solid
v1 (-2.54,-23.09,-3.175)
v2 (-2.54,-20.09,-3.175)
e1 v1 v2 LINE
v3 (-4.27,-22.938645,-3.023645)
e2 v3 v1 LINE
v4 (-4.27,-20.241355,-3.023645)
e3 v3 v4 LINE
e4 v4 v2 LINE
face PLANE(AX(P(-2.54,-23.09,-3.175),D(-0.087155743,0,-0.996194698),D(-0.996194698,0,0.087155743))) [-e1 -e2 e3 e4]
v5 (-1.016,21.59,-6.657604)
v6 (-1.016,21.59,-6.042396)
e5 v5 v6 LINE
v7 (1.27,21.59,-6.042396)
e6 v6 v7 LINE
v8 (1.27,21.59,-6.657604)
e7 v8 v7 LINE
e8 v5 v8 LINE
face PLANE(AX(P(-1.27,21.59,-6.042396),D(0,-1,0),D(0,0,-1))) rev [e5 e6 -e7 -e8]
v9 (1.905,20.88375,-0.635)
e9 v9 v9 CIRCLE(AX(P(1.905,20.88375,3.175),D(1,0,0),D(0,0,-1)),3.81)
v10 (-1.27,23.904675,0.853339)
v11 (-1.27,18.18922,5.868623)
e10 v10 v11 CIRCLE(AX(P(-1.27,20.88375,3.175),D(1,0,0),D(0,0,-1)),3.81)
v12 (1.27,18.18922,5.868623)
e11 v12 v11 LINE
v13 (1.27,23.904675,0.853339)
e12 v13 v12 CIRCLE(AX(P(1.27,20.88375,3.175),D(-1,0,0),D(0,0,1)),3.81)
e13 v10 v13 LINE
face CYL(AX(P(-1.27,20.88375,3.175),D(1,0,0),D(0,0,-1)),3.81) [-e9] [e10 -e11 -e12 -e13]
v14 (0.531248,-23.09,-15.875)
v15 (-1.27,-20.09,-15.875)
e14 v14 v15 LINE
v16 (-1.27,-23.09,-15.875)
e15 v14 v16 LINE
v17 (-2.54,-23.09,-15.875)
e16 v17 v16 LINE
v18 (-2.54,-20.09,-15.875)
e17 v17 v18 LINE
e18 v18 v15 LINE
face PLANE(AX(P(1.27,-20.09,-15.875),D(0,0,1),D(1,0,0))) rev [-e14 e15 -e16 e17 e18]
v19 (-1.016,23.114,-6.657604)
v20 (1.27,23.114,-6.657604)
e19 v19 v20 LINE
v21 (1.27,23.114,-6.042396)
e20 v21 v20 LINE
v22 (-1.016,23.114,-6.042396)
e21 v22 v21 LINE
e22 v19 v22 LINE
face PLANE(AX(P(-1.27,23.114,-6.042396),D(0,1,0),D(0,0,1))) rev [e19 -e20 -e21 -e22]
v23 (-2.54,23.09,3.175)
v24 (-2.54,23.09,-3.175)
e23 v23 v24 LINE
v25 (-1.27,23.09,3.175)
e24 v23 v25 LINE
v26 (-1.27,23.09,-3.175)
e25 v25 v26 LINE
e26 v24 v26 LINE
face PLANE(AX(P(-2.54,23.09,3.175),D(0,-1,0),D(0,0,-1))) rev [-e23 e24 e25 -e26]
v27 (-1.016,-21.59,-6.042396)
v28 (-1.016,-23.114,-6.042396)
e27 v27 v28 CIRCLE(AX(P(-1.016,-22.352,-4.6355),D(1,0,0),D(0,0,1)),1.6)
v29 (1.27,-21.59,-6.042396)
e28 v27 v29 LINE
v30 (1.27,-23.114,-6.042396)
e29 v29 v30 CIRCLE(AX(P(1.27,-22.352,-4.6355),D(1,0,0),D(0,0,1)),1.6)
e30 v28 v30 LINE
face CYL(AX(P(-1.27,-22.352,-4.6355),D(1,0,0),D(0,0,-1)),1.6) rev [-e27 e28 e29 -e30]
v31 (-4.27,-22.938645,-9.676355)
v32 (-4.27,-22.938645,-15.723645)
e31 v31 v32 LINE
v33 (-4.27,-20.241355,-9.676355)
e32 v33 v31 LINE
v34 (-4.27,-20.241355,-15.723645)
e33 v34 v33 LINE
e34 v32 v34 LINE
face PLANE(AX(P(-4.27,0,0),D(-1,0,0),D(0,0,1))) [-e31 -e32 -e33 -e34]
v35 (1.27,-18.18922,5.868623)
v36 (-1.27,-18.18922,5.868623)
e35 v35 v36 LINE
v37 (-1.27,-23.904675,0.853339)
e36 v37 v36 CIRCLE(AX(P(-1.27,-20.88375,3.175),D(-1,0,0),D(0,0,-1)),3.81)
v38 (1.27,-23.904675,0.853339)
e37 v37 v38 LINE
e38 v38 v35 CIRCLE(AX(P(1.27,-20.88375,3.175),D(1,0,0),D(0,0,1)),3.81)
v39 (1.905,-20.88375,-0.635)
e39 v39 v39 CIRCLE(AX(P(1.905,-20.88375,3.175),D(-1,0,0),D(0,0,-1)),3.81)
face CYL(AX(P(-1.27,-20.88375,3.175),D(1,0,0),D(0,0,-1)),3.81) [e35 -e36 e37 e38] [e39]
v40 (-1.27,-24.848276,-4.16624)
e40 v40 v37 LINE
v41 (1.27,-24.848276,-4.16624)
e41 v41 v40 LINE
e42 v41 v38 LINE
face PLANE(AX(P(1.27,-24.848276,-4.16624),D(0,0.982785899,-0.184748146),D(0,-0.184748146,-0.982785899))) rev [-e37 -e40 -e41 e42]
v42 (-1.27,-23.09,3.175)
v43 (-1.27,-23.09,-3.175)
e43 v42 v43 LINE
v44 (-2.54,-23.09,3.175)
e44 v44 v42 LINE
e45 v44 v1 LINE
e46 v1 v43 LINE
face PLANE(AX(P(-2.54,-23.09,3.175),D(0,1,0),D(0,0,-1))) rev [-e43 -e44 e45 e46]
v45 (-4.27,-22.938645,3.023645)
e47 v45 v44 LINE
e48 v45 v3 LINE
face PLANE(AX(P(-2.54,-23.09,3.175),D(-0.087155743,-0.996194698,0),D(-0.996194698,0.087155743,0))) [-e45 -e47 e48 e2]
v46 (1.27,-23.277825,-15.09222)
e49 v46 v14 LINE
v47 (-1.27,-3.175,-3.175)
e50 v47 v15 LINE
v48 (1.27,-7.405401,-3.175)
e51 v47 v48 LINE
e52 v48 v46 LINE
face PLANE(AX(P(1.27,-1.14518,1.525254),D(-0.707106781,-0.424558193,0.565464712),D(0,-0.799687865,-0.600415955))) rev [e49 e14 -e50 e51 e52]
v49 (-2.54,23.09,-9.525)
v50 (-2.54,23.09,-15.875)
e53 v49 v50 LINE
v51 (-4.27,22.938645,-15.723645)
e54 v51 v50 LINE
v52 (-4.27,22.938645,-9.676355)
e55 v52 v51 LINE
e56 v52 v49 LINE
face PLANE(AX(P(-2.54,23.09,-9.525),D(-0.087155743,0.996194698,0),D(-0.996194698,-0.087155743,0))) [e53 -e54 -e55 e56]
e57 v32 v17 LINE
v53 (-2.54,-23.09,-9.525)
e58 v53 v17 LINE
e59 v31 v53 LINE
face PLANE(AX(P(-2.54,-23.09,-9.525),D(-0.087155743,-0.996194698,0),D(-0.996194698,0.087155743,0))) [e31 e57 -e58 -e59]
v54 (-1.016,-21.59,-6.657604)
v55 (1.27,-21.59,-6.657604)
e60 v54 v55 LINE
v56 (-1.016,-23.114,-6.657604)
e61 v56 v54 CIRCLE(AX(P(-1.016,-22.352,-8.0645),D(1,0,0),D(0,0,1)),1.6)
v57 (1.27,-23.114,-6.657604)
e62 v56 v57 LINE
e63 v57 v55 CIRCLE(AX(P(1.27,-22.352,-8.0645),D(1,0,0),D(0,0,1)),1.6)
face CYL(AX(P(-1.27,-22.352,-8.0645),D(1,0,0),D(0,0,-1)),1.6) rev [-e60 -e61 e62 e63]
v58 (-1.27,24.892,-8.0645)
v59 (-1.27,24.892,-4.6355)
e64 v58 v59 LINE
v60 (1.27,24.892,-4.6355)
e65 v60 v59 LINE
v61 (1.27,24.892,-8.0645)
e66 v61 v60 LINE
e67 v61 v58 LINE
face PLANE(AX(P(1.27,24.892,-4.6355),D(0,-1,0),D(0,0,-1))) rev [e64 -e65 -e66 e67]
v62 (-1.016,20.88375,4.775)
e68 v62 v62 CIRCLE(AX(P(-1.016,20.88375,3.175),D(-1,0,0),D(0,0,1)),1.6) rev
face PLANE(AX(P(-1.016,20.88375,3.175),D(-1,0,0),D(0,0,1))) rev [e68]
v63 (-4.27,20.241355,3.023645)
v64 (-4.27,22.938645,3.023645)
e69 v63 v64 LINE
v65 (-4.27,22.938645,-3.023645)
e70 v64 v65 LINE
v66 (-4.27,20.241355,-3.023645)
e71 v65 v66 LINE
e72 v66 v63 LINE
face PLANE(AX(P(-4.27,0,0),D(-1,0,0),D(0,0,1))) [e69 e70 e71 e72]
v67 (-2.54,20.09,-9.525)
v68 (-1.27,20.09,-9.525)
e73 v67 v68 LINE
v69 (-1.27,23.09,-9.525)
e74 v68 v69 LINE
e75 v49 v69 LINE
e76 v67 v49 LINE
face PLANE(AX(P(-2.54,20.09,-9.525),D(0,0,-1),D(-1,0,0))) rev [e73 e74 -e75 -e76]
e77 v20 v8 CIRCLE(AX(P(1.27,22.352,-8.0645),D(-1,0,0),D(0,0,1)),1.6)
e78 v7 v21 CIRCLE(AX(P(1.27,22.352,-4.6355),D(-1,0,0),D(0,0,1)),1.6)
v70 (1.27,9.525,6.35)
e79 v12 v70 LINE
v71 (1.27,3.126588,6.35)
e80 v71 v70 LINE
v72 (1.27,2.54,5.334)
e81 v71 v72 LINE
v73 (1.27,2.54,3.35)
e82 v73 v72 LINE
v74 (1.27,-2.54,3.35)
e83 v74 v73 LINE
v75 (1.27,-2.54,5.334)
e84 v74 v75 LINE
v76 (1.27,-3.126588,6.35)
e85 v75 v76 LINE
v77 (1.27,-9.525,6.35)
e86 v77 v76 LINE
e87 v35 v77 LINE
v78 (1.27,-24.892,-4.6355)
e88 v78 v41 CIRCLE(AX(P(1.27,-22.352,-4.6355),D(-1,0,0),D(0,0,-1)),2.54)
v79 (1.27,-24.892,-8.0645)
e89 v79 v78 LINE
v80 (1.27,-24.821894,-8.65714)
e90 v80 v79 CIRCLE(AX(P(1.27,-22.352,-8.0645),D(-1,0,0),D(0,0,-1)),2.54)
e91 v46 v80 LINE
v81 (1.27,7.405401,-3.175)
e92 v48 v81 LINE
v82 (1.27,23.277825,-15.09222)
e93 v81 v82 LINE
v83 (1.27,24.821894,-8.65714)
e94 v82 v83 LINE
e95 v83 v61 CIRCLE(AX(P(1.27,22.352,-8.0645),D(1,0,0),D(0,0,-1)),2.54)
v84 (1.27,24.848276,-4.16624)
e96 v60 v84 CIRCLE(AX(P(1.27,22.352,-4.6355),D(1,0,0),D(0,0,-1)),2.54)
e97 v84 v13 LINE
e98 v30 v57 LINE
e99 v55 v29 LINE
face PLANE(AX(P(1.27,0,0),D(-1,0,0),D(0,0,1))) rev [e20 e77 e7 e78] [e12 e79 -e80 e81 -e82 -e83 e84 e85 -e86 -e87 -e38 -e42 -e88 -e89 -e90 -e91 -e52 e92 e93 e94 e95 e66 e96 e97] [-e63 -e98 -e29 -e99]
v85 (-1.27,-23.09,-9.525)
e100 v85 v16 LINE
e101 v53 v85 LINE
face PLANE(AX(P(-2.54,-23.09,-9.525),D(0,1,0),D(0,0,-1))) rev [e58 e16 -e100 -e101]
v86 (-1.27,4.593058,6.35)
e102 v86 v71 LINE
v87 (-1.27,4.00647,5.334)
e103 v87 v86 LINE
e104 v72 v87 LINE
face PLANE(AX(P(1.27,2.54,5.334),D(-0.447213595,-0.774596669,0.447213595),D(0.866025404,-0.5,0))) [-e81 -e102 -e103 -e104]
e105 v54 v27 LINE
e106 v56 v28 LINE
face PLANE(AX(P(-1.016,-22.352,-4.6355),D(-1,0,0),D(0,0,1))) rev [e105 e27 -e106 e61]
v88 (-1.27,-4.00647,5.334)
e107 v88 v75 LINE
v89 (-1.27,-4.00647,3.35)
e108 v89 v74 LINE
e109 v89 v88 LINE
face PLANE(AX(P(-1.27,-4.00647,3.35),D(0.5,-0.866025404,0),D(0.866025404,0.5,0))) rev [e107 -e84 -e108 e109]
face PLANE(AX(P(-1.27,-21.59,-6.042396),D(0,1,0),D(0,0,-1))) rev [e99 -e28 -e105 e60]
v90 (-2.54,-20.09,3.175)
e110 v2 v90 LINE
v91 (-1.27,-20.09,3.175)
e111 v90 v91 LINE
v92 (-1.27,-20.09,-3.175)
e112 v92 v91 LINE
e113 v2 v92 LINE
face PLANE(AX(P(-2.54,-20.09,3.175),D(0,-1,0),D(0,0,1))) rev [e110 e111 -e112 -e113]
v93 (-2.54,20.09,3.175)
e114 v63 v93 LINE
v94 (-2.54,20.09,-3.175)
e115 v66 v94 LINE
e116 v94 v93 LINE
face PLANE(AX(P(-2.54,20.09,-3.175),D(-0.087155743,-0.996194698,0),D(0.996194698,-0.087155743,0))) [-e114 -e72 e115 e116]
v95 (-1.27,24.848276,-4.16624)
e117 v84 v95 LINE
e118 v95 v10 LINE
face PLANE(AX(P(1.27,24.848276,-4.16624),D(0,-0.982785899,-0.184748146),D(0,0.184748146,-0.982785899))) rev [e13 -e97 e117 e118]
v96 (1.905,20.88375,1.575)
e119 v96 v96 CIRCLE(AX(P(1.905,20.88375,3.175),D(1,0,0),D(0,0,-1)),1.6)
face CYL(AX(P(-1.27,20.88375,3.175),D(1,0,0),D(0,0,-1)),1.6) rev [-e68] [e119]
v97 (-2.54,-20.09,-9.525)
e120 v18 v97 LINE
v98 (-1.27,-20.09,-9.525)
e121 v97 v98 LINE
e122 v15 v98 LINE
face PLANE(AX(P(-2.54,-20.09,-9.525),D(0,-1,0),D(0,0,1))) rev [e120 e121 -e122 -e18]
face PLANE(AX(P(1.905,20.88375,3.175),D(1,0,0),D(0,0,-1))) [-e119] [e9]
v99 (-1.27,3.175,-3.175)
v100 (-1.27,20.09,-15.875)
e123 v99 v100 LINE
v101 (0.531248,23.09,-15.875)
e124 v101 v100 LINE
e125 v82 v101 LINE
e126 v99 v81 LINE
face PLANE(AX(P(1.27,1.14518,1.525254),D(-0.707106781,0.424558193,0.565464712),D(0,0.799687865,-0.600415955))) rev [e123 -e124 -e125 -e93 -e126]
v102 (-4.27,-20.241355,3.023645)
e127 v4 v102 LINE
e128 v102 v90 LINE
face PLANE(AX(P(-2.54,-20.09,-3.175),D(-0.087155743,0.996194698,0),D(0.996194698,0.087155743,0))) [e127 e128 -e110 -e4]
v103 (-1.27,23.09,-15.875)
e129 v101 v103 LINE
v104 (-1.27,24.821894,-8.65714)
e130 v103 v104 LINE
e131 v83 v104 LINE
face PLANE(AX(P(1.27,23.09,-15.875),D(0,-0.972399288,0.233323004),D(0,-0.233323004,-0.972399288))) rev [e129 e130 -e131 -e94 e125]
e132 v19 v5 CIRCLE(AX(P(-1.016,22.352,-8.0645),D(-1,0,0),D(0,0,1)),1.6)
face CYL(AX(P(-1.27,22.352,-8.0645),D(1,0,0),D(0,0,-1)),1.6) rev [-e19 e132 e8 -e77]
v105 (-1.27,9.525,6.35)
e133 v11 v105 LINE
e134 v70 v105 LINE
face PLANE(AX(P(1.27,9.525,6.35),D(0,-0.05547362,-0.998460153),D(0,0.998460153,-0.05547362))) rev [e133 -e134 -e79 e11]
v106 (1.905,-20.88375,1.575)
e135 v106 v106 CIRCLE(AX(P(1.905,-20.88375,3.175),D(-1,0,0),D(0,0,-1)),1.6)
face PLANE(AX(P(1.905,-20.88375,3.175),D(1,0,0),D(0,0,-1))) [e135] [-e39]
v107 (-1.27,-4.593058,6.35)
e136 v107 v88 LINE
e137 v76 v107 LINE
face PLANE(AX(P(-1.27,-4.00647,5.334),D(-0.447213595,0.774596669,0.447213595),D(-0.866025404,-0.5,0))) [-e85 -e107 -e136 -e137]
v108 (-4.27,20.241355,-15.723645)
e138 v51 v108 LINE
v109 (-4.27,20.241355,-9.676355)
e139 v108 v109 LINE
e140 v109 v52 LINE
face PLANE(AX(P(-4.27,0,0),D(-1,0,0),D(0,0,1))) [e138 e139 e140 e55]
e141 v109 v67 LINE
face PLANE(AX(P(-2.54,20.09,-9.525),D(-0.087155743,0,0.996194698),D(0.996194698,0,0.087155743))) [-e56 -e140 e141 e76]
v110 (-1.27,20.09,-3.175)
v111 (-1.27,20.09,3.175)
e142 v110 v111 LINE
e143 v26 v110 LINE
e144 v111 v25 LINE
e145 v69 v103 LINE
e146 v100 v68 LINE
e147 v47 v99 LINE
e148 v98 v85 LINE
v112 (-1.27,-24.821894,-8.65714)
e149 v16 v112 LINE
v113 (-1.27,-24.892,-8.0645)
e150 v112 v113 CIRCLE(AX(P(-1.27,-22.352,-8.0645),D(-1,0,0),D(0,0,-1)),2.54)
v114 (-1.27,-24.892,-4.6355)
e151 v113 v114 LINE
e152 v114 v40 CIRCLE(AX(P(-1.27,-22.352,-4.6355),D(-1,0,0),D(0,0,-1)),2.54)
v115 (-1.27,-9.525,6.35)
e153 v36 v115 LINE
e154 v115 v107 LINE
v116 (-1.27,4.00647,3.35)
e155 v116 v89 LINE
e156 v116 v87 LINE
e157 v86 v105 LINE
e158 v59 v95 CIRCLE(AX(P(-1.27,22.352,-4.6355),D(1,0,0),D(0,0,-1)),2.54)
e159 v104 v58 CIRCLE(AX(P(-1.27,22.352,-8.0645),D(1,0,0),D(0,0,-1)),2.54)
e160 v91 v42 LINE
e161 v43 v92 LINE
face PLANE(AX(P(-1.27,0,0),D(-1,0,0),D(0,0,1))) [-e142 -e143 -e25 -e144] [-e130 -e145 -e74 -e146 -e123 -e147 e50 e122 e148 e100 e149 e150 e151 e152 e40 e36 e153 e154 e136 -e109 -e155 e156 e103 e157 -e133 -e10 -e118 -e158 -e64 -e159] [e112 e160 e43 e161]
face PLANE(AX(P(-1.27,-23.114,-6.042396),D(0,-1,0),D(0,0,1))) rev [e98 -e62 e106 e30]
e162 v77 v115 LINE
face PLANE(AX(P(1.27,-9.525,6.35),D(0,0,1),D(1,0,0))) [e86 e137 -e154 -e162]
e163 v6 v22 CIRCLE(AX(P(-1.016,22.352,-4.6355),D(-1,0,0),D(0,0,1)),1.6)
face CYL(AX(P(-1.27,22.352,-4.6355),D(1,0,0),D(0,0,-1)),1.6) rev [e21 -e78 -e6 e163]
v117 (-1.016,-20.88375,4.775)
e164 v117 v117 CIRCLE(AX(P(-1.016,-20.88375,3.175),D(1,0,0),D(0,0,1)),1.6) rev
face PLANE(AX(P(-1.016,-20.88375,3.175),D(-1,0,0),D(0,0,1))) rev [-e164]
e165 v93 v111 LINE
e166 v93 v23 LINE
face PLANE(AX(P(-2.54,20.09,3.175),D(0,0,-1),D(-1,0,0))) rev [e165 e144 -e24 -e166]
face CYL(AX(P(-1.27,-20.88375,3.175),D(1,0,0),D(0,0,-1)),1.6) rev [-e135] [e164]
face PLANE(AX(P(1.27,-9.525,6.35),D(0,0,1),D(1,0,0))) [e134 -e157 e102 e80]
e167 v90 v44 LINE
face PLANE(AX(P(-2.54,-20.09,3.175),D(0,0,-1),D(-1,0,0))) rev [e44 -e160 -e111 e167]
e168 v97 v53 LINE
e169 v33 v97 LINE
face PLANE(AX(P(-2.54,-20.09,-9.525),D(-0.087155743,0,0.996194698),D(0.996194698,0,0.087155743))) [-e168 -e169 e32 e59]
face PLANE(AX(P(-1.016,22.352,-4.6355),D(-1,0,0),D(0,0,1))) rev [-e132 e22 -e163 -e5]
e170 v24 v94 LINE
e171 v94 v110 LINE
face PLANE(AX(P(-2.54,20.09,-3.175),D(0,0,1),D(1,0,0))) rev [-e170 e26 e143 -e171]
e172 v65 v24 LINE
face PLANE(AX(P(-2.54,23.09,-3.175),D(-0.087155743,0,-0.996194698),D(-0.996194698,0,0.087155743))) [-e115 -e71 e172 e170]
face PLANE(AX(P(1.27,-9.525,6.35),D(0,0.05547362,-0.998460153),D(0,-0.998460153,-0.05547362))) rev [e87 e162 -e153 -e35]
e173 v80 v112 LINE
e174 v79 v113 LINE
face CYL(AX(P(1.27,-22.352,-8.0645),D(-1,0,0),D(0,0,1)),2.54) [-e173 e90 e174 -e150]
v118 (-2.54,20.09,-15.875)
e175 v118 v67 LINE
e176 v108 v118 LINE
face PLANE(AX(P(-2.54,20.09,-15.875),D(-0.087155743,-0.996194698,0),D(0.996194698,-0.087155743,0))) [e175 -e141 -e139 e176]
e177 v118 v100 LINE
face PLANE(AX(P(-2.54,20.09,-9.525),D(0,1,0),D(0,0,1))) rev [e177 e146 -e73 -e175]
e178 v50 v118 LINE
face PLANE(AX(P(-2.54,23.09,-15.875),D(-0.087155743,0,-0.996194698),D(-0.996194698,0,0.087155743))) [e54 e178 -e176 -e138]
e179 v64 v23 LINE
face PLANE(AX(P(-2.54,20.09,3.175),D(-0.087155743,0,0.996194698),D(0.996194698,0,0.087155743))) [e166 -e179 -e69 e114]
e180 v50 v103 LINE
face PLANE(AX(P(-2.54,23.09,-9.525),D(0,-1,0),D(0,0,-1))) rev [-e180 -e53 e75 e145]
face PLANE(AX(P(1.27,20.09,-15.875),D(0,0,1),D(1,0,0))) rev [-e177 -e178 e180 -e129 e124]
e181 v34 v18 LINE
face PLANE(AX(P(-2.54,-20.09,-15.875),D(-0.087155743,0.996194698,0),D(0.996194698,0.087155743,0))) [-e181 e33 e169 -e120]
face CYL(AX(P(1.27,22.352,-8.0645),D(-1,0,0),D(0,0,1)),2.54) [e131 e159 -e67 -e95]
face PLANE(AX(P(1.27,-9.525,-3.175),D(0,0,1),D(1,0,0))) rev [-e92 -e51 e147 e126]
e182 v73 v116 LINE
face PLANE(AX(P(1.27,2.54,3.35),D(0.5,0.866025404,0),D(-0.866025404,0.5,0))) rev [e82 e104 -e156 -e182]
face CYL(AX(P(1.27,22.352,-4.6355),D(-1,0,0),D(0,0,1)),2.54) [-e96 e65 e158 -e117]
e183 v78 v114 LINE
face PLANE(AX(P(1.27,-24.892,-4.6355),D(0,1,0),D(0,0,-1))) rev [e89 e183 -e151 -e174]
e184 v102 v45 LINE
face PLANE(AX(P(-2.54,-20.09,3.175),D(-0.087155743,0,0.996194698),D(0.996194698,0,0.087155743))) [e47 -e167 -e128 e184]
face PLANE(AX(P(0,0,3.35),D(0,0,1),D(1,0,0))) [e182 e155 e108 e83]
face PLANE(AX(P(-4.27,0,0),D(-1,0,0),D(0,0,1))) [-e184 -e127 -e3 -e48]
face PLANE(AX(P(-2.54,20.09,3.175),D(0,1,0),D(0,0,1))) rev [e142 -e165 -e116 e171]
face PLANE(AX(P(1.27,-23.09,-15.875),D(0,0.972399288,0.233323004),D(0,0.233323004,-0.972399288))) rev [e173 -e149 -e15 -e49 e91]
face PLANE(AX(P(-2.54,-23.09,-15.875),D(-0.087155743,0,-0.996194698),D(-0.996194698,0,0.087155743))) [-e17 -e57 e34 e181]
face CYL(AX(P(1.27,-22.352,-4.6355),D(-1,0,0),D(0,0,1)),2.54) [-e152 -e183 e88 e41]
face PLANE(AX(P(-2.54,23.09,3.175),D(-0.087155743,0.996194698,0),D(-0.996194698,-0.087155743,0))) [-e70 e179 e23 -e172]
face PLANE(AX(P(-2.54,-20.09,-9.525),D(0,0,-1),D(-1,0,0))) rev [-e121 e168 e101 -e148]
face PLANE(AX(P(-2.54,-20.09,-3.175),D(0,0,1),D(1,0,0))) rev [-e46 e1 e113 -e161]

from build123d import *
from OCP.BRepFilletAPI import BRepFilletAPI_MakeChamfer

# Parameters (mm, degrees)
DOWELSUPPORT_DEPTH       = 1.905
DOWELSUPPORT_DEPTH_BACK  = 1.27
SKETCH3_R                = 3.81
SKETCH5_W                = 9.525
SKETCH5_H                = 19.05
SLIDERDOWELSUPPORT_DEPTH = 1.27
STRINGDOWELSUPPORT_DEPTH = 1.27
SKETCH9_W                = 6.35
SKETCH9_H                = 3
TABSUPPORT_DEPTH         = 1.27
INTERSUPPORT_DEPTH       = 1.27
DOWELHOLES_DEPTH         = 30.584731096
DOWELHOLES_DEPTH_BACK    = 30.584731096
SKETCH11_R               = 1.600000102
BOSS_EXTRUDE1_START      = -1.27
SKETCH11_2_R             = 1.600000102
BOSS_EXTRUDE1_DEPTH      = 0.254
SKETCH14_W               = 6.35
SKETCH14_H               = 3
TABBASE_DEPTH            = 1.27
SKETCH15_W               = 6.35
SKETCH15_H               = 3
TABDRAFT_DEPTH           = 1.73
TABDRAFT_DRAFT           = 5
TABDRAFT_PROFILE_2_DEPTH = 1.73
TABDRAFT_PROFILE_2_DRAFT = 5
CHAMFER1_SIZE            = 2.54
CUT_EXTRUDE1_DEPTH       = 3
CHAMFER2_SIZE            = 0.508
CHAMFER2_SIZE2           = 1.016


with BuildPart() as part:
    # Sketch3 → DowelSupport (new, two sides: drawn at the far end of the back side and taken through both)
    with BuildSketch(Plane(origin=(0, 0, 0), x_dir=(0, 0, -1), z_dir=(1, 0, 0)).offset(-DOWELSUPPORT_DEPTH_BACK)):
        with Locations((-3.175, 20.88375)):
            Circle(SKETCH3_R)
    extrude(amount=DOWELSUPPORT_DEPTH + DOWELSUPPORT_DEPTH_BACK)



with BuildPart() as body_2:
    # Sketch5 → SliderDowelSupport (new, symmetric)
    with BuildSketch(Plane(origin=(0, 0, 0), x_dir=(0, 0, -1), z_dir=(1, 0, 0))):
        with Locations((-1.5875, 0)):
            Rectangle(SKETCH5_W, SKETCH5_H)
    extrude(amount=SLIDERDOWELSUPPORT_DEPTH, both=True)


with BuildPart() as body_3:
    # Sketch8 → StringDowelSupport (new, symmetric)
    with BuildSketch(Plane(origin=(0, 0, 0), x_dir=(0, 0, -1), z_dir=(1, 0, 0))):
        with BuildLine():
            Line((4.6355, 24.892), (8.0645, 24.892))
            ThreePointArc((8.0645, 24.892), (10.6045, 22.352), (8.0645, 19.812))
            Line((8.0645, 19.812), (4.6355, 19.812))
            ThreePointArc((4.6355, 19.812), (2.0955, 22.352), (4.6355, 24.892))
        make_face()
    extrude(amount=STRINGDOWELSUPPORT_DEPTH, both=True)


with BuildPart() as part_1:
    add(part.part)

    add(body_3.part)  # TabSupport merges body 3
    # Sketch9 → TabSupport (add, symmetric)
    with BuildSketch(Plane(origin=(0, 0, 0), x_dir=(0, 0, -1), z_dir=(1, 0, 0))):
        with Locations((0, 21.59)):
            Rectangle(SKETCH9_W, SKETCH9_H)
        with Locations((12.7, 21.59)):
            Rectangle(SKETCH9_W, SKETCH9_H)
    extrude(amount=TABSUPPORT_DEPTH, both=True)


    add(body_2.part)  # InterSupport merges body 2
    # Sketch10 → InterSupport (add, symmetric)
    with BuildSketch(Plane(origin=(0, 0, 0), x_dir=(0, 0, -1), z_dir=(1, 0, 0))):
        Polygon((-6.35, 9.525), (-5.711088789, 21.024652996), (-3.644260291, 23.380026182), (4.166239709, 24.848276182), (8.657140431, 24.821894192), (15.875, 23.09), (15.875, 20.09), (3.175, 3.175), (3.175, 9.525), align=None)
    extrude(amount=INTERSUPPORT_DEPTH, both=True)

    # Sketch11 → DowelHoles (cut, two sides: drawn at the far end of the back side and taken through both)
    with BuildSketch(Plane(origin=(0, 0, 0), x_dir=(0, 0, -1), z_dir=(1, 0, 0)).offset(-DOWELHOLES_DEPTH_BACK)):
        with Locations((-3.175, 20.88375)):
            Circle(SKETCH11_R)
        with BuildLine():
            Line((6.04239599, 21.59), (6.65760401, 21.59))
            ThreePointArc((6.65760401, 21.59), (9.664500102, 22.352), (6.65760401, 23.114))
            Line((6.65760401, 23.114), (6.04239599, 23.114))
            ThreePointArc((6.04239599, 23.114), (3.035499898, 22.352), (6.04239599, 21.59))
        make_face()
    extrude(amount=DOWELHOLES_DEPTH + DOWELHOLES_DEPTH_BACK, mode=Mode.SUBTRACT)

    # Sketch11<2> → Boss-Extrude1 (add)
    with BuildSketch(Plane(origin=(0, 0, 0), x_dir=(0, 0, -1), z_dir=(1, 0, 0)).offset(BOSS_EXTRUDE1_START)):
        with BuildLine():
            Line((6.04239599, 21.59), (6.65760401, 21.59))
            ThreePointArc((6.65760401, 21.59), (9.664500102, 22.352), (6.65760401, 23.114))
            Line((6.65760401, 23.114), (6.04239599, 23.114))
            ThreePointArc((6.04239599, 23.114), (3.035499898, 22.352), (6.04239599, 21.59))
        make_face()
        with Locations((-3.175, 20.88375)):
            Circle(SKETCH11_2_R)
    extrude(amount=BOSS_EXTRUDE1_DEPTH)

    # Sketch14 → TabBase (add)
    with BuildSketch(Plane.ZY.offset(1.27)):
        with Locations((-12.7, 21.59)):
            Rectangle(SKETCH14_W, SKETCH14_H)
        with Locations((0, 21.59)):
            Rectangle(SKETCH14_W, SKETCH14_H)
    extrude(amount=TABBASE_DEPTH)


with BuildPart() as tabdraft_tool:
    # Sketch15 → TabDraft (with draft: the straight prism first)
    with BuildSketch(Plane.ZY.offset(2.54)):
        with Locations((0, 21.59)):
            Rectangle(SKETCH15_W, SKETCH15_H)
    extrude(amount=TABDRAFT_DEPTH)
    # TabDraft: the draft: its side faces are tilted about the plane it starts from
    tabdraft_sides = [tabdraft_tool.faces().sort_by_distance(p)[0] for p in [
        (-3.405, 21.59, -3.175),
        (-3.405, 20.09, 0),
        (-3.405, 21.59, 3.175),
        (-3.405, 23.09, 0),
    ]]
    draft(tabdraft_sides, Plane.ZY.offset(2.54), TABDRAFT_DRAFT)


with BuildPart() as part_2:
    add(part_1.part)

    # TabDraft: add tabdraft_tool
    add(tabdraft_tool.part)


with BuildPart() as tabdraft_profile_2_tool:
    # Sketch15 → TabDraft profile 2 (with draft: the straight prism first)
    with BuildSketch(Plane.ZY.offset(2.54)):
        with Locations((-12.7, 21.59)):
            Rectangle(SKETCH15_W, SKETCH15_H)
    extrude(amount=TABDRAFT_PROFILE_2_DEPTH)
    # TabDraft profile 2: the draft: its side faces are tilted about the plane it starts from
    tabdraft_profile_2_sides = [tabdraft_profile_2_tool.faces().sort_by_distance(p)[0] for p in [
        (-3.405, 21.59, -15.875),
        (-3.405, 20.09, -12.7),
        (-3.405, 21.59, -9.525),
        (-3.405, 23.09, -12.7),
    ]]
    draft(tabdraft_profile_2_sides, Plane.ZY.offset(2.54), TABDRAFT_PROFILE_2_DRAFT)


with BuildPart() as part_3:
    add(part_2.part)

    # TabDraft profile 2: add tabdraft_profile_2_tool
    add(tabdraft_profile_2_tool.part)

    # Chamfer1
    chamfer1_edges = [part_3.edges().sort_by_distance(p)[0] for p in [
        (1.27, 11.6325, -9.525),
    ]]
    chamfer(chamfer1_edges, length=CHAMFER1_SIZE - 0.0001)  # a hair under: the kernel refuses the full size

    # Mirror1: part across plane


with BuildPart() as part_4:
    add(part_3.part)
    add(part_3.part.mirror(Plane.ZX))

    # Sketch16 → Cut-Extrude1 (cut)
    with BuildSketch(Plane.XY.offset(6.35)):
        Polygon((-1.27, -4.006469684), (1.27, -2.54), (1.27, 2.54), (-1.27, 4.006469684), align=None)
    extrude(amount=-CUT_EXTRUDE1_DEPTH, mode=Mode.SUBTRACT)

    # Chamfer2: one chamfer whose edges measure the first distance from different faces: ONE call of the kernel's chamfer builder (chamfer() names one face for all edges)
    chamfer2_edges_1 = [part_4.edges().sort_by_distance(p)[0] for p in [
        (0, -3.273234842, 6.35),
    ]]
    chamfer2_side_1 = [part_4.faces().sort_by_distance(p)[0] for p in [
        (0.049650417, -6.38478458, 6.35),
    ]]
    chamfer2_edges_2 = [part_4.edges().sort_by_distance(p)[0] for p in [
        (0, 3.273234842, 6.35),
    ]]
    chamfer2_side_2 = [part_4.faces().sort_by_distance(p)[0] for p in [
        (0.049650417, 6.38478458, 6.35),
    ]]
    chamfer2 = BRepFilletAPI_MakeChamfer(part_4.part.solid().wrapped)
    for e in chamfer2_edges_1:
        chamfer2.Add(CHAMFER2_SIZE, CHAMFER2_SIZE2, e.wrapped, chamfer2_side_1[0].wrapped)  # the first distance lies on this face
    for e in chamfer2_edges_2:
        chamfer2.Add(CHAMFER2_SIZE, CHAMFER2_SIZE2, e.wrapped, chamfer2_side_2[0].wrapped)  # the first distance lies on this face
    add(Compound.cast(chamfer2.Shape()), mode=Mode.REPLACE)


solid = part_4.part
